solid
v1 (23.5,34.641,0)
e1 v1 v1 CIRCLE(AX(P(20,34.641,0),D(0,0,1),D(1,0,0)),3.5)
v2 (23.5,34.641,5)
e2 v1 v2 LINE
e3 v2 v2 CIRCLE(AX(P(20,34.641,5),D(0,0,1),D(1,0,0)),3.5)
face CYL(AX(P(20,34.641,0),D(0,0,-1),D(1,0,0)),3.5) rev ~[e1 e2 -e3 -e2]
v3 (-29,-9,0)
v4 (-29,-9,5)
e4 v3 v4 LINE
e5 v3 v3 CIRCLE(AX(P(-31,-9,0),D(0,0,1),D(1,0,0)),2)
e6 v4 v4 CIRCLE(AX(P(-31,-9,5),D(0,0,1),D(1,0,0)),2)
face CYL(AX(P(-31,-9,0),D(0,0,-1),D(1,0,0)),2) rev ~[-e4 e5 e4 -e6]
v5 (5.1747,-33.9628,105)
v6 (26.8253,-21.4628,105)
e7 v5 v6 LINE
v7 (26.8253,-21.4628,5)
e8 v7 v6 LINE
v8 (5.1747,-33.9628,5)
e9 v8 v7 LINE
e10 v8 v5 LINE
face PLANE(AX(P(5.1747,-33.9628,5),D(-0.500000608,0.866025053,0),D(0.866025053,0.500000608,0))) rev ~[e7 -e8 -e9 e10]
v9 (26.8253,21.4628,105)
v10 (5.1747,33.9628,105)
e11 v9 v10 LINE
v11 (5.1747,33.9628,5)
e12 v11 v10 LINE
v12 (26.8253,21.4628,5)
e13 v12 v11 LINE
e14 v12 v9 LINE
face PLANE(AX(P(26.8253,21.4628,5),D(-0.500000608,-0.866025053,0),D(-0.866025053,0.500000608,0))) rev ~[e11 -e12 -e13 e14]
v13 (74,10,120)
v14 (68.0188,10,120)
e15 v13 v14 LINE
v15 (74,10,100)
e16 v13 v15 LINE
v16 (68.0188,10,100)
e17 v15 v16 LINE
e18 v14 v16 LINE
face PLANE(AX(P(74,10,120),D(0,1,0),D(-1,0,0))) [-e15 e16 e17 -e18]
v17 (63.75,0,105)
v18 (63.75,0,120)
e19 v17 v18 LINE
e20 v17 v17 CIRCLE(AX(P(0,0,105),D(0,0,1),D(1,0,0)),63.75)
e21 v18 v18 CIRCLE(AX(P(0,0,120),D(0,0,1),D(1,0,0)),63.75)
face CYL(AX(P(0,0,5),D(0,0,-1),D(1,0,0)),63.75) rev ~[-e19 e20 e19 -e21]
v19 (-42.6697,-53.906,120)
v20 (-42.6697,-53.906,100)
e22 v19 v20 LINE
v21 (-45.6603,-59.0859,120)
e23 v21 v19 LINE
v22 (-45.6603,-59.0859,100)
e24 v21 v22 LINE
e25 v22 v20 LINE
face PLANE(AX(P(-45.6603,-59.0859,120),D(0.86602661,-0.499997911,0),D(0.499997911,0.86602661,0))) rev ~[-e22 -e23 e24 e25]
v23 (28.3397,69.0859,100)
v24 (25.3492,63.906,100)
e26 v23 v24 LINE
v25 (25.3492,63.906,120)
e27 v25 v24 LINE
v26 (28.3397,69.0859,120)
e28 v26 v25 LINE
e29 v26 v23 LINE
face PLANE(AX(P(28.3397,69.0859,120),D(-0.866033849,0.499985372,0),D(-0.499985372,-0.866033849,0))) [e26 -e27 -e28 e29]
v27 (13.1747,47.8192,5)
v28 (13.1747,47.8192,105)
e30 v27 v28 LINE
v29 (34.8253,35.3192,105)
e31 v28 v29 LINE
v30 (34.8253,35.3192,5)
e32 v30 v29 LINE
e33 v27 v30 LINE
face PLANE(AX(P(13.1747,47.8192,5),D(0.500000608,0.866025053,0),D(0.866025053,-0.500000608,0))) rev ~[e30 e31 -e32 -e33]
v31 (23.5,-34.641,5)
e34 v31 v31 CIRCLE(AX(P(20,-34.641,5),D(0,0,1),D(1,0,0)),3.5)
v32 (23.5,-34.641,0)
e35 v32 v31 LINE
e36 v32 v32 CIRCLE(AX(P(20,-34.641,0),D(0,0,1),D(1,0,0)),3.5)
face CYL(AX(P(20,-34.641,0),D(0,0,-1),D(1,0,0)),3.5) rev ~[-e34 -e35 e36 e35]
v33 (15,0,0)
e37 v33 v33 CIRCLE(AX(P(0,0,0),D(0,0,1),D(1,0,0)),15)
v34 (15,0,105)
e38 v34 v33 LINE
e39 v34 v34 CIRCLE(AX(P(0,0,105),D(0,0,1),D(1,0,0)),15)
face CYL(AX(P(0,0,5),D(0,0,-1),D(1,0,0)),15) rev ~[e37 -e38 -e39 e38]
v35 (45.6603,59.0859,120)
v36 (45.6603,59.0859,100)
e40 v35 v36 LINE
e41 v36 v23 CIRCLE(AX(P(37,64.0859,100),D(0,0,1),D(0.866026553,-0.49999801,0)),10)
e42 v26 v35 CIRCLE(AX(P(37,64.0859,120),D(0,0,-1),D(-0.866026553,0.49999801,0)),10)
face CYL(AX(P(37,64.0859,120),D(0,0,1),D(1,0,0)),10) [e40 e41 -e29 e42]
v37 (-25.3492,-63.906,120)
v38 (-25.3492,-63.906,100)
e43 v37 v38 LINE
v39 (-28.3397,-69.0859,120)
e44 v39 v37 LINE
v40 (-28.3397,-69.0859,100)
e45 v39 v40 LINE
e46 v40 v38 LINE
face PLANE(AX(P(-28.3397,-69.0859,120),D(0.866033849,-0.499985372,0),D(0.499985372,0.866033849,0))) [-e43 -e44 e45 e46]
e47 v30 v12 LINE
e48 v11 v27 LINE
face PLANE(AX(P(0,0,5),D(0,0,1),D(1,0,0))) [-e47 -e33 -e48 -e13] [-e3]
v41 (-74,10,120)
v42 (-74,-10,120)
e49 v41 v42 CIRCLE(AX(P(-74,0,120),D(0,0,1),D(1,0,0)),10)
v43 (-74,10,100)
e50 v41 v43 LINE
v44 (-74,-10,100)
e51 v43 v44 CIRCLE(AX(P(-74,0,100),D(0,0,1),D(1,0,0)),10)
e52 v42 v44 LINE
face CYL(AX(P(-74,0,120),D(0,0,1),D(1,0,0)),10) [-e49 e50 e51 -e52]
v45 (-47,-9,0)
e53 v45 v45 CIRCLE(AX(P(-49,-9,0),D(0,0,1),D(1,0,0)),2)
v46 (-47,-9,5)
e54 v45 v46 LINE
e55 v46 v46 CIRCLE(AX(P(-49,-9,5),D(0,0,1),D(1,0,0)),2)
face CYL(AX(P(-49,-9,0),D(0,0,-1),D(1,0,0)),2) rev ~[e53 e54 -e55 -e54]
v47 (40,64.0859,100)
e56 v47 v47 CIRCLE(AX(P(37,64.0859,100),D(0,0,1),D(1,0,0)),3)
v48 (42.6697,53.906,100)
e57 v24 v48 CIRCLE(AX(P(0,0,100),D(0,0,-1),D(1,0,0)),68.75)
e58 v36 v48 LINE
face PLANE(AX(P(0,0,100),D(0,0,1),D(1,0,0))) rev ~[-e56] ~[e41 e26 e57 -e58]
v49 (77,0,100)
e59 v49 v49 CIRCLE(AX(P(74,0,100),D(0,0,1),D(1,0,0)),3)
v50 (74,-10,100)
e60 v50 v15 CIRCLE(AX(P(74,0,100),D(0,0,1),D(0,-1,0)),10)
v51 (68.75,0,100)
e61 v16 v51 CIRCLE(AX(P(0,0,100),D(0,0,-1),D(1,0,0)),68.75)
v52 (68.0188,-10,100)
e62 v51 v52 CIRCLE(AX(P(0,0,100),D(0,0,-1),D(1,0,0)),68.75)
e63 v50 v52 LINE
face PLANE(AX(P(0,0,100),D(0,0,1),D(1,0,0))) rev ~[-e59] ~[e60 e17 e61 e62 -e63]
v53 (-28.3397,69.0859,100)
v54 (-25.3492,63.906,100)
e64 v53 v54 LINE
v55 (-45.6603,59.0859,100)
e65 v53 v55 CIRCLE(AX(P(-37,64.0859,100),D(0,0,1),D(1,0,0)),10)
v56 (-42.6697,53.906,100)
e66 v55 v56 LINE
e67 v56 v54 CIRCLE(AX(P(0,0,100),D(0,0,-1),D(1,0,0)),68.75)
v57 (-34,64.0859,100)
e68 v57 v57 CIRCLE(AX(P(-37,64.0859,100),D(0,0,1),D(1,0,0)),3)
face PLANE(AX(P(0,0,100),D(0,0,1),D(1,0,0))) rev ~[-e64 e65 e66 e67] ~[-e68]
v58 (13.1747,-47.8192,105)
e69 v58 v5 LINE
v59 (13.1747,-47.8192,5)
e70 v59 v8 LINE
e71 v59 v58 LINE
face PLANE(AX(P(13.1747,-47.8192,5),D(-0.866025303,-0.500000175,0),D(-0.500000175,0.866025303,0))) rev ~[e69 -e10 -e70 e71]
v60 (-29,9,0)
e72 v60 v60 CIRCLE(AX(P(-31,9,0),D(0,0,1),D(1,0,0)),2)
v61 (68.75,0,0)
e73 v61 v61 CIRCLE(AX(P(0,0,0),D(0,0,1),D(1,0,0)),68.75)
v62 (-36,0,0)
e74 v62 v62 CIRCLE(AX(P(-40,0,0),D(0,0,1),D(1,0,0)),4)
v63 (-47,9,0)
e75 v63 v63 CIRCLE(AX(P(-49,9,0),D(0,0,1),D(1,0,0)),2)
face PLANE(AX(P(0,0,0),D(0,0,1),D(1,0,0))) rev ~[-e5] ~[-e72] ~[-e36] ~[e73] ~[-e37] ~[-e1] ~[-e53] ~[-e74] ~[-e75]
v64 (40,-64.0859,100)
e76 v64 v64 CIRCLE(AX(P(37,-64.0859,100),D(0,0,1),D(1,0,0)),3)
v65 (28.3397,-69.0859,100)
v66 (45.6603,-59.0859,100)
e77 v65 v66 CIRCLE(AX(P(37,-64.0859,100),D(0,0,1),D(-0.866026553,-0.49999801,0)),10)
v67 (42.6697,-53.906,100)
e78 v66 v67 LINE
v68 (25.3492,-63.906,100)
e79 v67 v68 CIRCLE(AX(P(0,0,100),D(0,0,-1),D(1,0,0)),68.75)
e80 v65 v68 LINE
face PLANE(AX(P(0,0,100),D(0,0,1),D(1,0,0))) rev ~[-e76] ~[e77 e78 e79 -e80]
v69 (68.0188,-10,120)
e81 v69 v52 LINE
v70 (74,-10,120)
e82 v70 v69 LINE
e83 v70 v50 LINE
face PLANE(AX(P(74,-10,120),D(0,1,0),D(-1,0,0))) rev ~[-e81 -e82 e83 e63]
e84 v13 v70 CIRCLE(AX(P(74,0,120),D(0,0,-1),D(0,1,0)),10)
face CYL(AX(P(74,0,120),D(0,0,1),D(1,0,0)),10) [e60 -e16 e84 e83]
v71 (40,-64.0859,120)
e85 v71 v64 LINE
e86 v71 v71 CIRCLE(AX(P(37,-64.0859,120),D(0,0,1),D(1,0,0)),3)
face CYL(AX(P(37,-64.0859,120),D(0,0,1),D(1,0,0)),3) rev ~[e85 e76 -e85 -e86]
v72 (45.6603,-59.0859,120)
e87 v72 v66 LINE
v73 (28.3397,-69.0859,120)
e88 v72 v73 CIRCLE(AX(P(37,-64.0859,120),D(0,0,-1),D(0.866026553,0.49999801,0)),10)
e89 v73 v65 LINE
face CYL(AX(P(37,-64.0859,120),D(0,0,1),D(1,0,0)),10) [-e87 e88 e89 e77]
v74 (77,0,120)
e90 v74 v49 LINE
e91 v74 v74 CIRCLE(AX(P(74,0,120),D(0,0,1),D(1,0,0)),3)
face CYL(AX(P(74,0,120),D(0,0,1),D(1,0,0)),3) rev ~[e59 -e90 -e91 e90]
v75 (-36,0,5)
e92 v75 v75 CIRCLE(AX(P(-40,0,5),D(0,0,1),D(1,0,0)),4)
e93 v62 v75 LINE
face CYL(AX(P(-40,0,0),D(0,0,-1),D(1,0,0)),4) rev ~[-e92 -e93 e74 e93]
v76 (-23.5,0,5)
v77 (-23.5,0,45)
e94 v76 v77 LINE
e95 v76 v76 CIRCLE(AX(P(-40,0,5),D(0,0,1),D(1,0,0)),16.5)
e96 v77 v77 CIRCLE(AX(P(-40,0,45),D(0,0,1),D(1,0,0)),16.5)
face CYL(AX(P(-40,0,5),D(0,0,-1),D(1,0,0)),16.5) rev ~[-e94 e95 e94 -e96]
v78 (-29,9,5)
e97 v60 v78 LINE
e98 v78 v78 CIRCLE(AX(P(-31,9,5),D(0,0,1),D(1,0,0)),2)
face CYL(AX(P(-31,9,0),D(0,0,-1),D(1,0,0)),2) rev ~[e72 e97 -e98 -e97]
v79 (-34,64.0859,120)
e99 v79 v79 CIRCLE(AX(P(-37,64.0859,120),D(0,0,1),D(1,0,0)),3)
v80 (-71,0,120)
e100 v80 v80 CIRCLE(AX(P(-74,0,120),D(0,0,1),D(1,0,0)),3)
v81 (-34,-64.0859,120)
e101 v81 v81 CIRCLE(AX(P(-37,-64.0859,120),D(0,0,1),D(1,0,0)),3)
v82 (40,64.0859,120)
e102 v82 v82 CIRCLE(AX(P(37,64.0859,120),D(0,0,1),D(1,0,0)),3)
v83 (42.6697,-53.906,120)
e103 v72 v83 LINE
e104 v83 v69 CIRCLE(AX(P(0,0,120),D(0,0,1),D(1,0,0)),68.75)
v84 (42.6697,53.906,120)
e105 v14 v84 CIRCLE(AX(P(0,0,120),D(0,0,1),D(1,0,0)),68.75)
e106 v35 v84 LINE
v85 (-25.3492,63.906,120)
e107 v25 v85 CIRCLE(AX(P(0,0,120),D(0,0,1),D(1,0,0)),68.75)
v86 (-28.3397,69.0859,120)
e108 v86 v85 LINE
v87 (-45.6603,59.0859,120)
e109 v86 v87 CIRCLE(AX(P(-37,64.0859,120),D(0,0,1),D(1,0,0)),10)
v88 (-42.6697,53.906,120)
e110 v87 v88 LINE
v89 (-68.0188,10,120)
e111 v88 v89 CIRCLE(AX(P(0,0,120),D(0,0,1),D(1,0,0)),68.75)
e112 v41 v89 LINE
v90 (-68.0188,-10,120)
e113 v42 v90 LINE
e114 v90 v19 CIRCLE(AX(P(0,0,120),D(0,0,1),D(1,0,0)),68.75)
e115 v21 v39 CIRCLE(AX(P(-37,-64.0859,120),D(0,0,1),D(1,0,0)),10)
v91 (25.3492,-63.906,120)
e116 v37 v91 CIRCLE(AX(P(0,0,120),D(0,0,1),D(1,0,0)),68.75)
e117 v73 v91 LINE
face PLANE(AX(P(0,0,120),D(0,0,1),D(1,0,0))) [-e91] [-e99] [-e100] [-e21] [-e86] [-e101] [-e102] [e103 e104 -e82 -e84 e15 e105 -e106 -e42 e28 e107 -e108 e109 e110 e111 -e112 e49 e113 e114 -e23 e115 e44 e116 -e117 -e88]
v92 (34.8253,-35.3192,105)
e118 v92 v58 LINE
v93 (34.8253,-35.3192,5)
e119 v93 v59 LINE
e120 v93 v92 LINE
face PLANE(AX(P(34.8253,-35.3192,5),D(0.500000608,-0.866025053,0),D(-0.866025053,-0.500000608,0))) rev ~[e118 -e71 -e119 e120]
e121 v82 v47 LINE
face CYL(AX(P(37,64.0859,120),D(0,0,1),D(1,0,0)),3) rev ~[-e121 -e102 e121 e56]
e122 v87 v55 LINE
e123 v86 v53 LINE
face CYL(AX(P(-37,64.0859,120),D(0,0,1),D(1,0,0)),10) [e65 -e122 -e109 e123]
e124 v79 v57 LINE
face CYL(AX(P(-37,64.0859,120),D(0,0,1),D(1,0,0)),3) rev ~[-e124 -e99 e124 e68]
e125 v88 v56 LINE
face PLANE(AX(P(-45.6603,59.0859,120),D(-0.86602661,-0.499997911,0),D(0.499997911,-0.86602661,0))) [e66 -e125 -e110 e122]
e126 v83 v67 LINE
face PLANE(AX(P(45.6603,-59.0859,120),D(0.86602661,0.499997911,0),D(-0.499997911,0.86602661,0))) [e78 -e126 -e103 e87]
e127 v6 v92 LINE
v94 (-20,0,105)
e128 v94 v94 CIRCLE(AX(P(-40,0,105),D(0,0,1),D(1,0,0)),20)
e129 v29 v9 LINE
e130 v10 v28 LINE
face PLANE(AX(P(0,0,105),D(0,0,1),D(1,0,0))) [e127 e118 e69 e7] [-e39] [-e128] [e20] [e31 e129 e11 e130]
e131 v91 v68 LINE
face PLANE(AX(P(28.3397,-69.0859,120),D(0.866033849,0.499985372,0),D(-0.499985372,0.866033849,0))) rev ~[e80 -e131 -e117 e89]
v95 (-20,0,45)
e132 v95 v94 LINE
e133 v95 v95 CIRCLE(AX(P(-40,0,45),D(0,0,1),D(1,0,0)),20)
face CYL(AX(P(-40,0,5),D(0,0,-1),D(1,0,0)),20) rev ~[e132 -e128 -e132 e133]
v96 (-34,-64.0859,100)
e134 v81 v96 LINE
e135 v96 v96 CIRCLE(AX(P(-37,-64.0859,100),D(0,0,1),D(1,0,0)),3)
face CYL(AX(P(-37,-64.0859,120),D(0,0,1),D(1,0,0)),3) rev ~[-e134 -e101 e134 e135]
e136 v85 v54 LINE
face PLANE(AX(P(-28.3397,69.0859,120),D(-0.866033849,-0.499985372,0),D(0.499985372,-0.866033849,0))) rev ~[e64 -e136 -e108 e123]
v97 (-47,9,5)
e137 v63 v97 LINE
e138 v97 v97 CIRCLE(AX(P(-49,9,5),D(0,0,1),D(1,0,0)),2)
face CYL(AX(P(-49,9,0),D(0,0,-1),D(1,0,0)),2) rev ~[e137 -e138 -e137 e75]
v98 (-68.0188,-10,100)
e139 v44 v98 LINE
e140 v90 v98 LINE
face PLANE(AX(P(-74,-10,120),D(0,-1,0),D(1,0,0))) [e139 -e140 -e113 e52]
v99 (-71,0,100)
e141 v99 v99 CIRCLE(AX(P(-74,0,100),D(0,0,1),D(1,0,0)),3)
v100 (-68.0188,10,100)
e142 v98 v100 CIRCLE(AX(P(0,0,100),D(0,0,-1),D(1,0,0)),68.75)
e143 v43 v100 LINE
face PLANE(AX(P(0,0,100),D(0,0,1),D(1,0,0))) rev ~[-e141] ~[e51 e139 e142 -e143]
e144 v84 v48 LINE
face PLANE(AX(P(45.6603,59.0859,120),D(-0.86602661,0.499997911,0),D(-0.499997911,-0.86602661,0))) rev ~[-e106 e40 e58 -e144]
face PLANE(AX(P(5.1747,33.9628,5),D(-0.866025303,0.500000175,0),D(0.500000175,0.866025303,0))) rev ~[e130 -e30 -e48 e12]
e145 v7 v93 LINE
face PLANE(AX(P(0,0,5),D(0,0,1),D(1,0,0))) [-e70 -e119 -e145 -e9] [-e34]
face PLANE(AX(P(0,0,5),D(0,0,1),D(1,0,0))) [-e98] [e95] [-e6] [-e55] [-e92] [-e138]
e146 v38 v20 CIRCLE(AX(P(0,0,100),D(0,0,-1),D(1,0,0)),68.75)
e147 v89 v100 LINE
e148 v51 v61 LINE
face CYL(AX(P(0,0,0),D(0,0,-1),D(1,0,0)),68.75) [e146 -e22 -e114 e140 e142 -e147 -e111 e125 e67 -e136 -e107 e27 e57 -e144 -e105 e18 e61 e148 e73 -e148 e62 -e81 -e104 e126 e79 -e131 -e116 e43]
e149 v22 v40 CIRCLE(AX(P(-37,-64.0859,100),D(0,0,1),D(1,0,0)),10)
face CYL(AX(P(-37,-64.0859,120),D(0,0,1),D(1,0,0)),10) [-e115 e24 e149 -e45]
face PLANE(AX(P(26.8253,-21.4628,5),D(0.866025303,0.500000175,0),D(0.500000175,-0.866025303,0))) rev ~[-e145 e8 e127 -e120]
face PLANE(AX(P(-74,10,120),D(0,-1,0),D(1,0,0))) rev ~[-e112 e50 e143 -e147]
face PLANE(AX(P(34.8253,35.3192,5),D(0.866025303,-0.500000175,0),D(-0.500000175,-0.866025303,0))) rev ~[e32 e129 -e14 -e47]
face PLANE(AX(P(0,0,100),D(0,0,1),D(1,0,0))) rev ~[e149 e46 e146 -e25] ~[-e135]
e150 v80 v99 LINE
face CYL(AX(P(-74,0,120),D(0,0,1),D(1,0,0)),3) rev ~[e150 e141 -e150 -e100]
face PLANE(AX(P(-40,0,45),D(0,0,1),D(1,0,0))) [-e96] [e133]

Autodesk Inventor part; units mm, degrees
ref_plane "YZ Plane" through (0, 0, 0) normal (1, 0, 0) x (0, 1, 0)
ref_plane "XZ Plane" through (0, 0, 0) normal (0, 1, 0) x (-1, 0, 0)
ref_plane "XY Plane" through (0, 0, 0) normal (0, 0, 1) x (1, 0, 0)
sketch "Sketch1" plane through (0, 0, 0) normal (0, 0, 1) x (1, 0, 0)
  circle A0 centre (0, 0) radius 68.75
  circle A1 centre (0, 0) radius 15
  circle A2 centre (-40, 0) radius 4
  line L0 (-49, 9) -> (-31, 9) construction
  line L1 (-31, 9) -> (-31, -9) construction
  line L2 (-31, -9) -> (-49, -9) construction
  line L3 (-49, -9) -> (-49, 9) construction
  circle A3 centre (-49, 9) radius 2
  circle A4 centre (-31, 9) radius 2
  circle A5 centre (-31, -9) radius 2
  circle A6 centre (-49, -9) radius 2
  circle A7 centre (20, 34.641) radius 3.5
  line L4 (0, 0) -> (-40, 0) construction
  line L5 (0, 0) -> (20, 34.641) construction
  line L6 (0, 0) -> (20, -34.641) construction
  circle A8 centre (20, -34.641) radius 3.5
  point P0 (-49, 0)
  point P1 (-40, 9)
  dimension "d0" = 137.5
  dimension "d1" = 30
  dimension "d2" = 8
  dimension "d3" = 40
  dimension "d4" = 18
  dimension "d5" = 18
  dimension "d6" = 4
  dimension "d7" = 4
  dimension "d8" = 4
  dimension "d9" = 4
  dimension "d10" = 7
  dimension "d11" = 40
  dimension "d12" = 120
  dimension "d13" = 40
  dimension "d14" = 7
  dimension "d15" = 120
extrude "Extrusion1" add sketch "Sketch1" along normal blind 5
sketch "Sketch2" plane through (0, 0, 5) normal (0, 0, 1) x (1, 0, 0)
  circle A0 centre (0, 0) radius 68.75 projected
  circle A1 centre (0, 0) radius 63.75
  dimension "d18" = 5
extrude "Extrusion2" add sketch "Sketch2" along normal blind 115
sketch "Sketch3" plane through (0, 0, 5) normal (0, 0, 1) x (1, 0, 0)
  circle A0 centre (-40, 0) radius 4 projected
  circle A1 centre (0, 0) radius 15 projected
  circle A2 centre (20, 34.641) radius 3.5 projected
  circle A3 centre (20, -34.641) radius 3.5 projected
  circle A4 centre (-40, 0) radius 20
  line L0 (26.8253, 21.4628) -> (5.1747, 33.9628)
  line L1 (5.1747, 33.9628) -> (13.1747, 47.8192)
  line L2 (13.1747, 47.8192) -> (34.8253, 35.3192)
  line L3 (34.8253, 35.3192) -> (26.8253, 21.4628)
  line L4 (26.8253, 21.4628) -> (13.1747, 47.8192) construction
  line L5 (5.1747, 33.9628) -> (34.8253, 35.3192) construction
  line L6 (0, 0) -> (-40, 0) construction
  line L7 (5.1747, -33.9628) -> (26.8253, -21.4628)
  line L8 (26.8253, -21.4628) -> (34.8253, -35.3192)
  line L9 (34.8253, -35.3192) -> (13.1747, -47.8192)
  line L10 (13.1747, -47.8192) -> (5.1747, -33.9628)
  circle A5 centre (0, 0) radius 63.75 projected
  dimension "d21" = 40
  dimension "d23" = 120
  dimension "d24" = 16
  dimension "d25" = 25
  dimension "d28" = 120
extrude "Extrusion3" add sketch "Sketch3" along normal blind 100 contours A5
sketch "Sketch4" plane through (0, 0, 105) normal (0, 0, 1) x (1, 0, 0)
  circle A0 centre (50, 0) radius 3
  circle A1 centre (-25, 43.3013) radius 3
  circle A2 centre (-25, -43.3013) radius 3
  circle A3 centre (50, 0) radius 15
  circle A4 centre (-25, 43.3013) radius 15
  circle A5 centre (-25, -43.3013) radius 15
  point P0 (0, 0)
  dimension "d32" = 6
  dimension "d33" = 50
  dimension "d36" = 360
  dimension "d38" = 30
  dimension "d39" = 30
  dimension "d40" = 30
extrude "Extrusion4" add sketch "Sketch4" along normal blind 15
sketch "Sketch6" plane through (-40, 0, 5) normal (0, 0, 1) x (1, 0, 0)
  circle A0 centre (0, 0) radius 4 projected
  circle A1 centre (0, 0) radius 16.5
  circle A2 centre (0, 0) radius 20 projected
  point P0 (40, 0)
  point P1 (20, 0)
  dimension "d46" = 33
extrude "Extrusion6" add sketch "Sketch6" along normal blind 40 contours A2
sketch "Sketch7" plane through (0, 0, 120) normal (0, 0, 1) x (1, 0, 0)
  circle A0 centre (37, 64.0859) radius 10
  line L0 (28.3397, 69.0859) -> (25.3492, 63.906)
  line L1 (45.6603, 59.0859) -> (42.6697, 53.906)
  circle A1 centre (0, 0) radius 68.75 construction
  line L2 (0, 0) -> (37, 64.0859) construction
  line L3 (25.3492, 63.906) -> (42.6697, 53.906)
  circle A2 centre (20, 34.641) radius 3.5 projected
  circle A3 centre (37, 64.0859) radius 3
  circle A4 centre (-37, 64.0859) radius 10
  line L4 (-45.6603, 59.0859) -> (-42.6697, 53.906)
  line L5 (-28.3397, 69.0859) -> (-25.3492, 63.906)
  line L6 (-42.6697, 53.906) -> (-25.3492, 63.906)
  circle A5 centre (-37, 64.0859) radius 3
  circle A6 centre (-74, 0) radius 10
  line L7 (-74, -10) -> (-68.0188, -10)
  line L8 (-74, 10) -> (-68.0188, 10)
  line L9 (-68.0188, -10) -> (-68.0188, 10)
  circle A7 centre (-74, 0) radius 3
  circle A8 centre (-37, -64.0859) radius 10
  line L10 (-28.3397, -69.0859) -> (-25.3492, -63.906)
  line L11 (-45.6603, -59.0859) -> (-42.6697, -53.906)
  line L12 (-25.3492, -63.906) -> (-42.6697, -53.906)
  circle A9 centre (-37, -64.0859) radius 3
  circle A10 centre (37, -64.0859) radius 10
  line L13 (45.6603, -59.0859) -> (42.6697, -53.906)
  line L14 (28.3397, -69.0859) -> (25.3492, -63.906)
  line L15 (42.6697, -53.906) -> (25.3492, -63.906)
  circle A11 centre (37, -64.0859) radius 3
  circle A12 centre (74, 0) radius 10
  line L16 (74, 10) -> (68.0188, 10)
  line L17 (74, -10) -> (68.0188, -10)
  line L18 (68.0188, 10) -> (68.0188, -10)
  circle A13 centre (74, 0) radius 3
  dimension "d49" = 20
  dimension "d52" = 74
  dimension "d53" = 6
  dimension "d56" = 360
extrude "Extrusion7" add sketch "Sketch7" against normal blind 20 contours A0 L3 | A0 L3 L0 | L1 L3 A0 | L3 A0 | A4 L6 | A4 L5 L6 | A4 L6 | A4 L6 L4 | A6 L9 | L8 L9 A6 | A6 L9 L7 | A6 L9 | A8 L12 | L11 L12 A8 | A8 L12 L10 | A8 L12 | A10 L15 | A10 L15 L13 | L14 L15 A10 | L15 A10 | A12 L18 | A12 L18 L16 | L17 L18 A12 | L18 A12
sketch "Sketch8" plane through (0, 0, 105) normal (0, 0, 1) x (1, 0, 0)
  circle A0 centre (0, 0) radius 63.75
  dimension "d62" = 127.5
extrude "Extrusion8" cut sketch "Sketch8" along normal through all
properties part number "TA02" material "ABS Plastic"
